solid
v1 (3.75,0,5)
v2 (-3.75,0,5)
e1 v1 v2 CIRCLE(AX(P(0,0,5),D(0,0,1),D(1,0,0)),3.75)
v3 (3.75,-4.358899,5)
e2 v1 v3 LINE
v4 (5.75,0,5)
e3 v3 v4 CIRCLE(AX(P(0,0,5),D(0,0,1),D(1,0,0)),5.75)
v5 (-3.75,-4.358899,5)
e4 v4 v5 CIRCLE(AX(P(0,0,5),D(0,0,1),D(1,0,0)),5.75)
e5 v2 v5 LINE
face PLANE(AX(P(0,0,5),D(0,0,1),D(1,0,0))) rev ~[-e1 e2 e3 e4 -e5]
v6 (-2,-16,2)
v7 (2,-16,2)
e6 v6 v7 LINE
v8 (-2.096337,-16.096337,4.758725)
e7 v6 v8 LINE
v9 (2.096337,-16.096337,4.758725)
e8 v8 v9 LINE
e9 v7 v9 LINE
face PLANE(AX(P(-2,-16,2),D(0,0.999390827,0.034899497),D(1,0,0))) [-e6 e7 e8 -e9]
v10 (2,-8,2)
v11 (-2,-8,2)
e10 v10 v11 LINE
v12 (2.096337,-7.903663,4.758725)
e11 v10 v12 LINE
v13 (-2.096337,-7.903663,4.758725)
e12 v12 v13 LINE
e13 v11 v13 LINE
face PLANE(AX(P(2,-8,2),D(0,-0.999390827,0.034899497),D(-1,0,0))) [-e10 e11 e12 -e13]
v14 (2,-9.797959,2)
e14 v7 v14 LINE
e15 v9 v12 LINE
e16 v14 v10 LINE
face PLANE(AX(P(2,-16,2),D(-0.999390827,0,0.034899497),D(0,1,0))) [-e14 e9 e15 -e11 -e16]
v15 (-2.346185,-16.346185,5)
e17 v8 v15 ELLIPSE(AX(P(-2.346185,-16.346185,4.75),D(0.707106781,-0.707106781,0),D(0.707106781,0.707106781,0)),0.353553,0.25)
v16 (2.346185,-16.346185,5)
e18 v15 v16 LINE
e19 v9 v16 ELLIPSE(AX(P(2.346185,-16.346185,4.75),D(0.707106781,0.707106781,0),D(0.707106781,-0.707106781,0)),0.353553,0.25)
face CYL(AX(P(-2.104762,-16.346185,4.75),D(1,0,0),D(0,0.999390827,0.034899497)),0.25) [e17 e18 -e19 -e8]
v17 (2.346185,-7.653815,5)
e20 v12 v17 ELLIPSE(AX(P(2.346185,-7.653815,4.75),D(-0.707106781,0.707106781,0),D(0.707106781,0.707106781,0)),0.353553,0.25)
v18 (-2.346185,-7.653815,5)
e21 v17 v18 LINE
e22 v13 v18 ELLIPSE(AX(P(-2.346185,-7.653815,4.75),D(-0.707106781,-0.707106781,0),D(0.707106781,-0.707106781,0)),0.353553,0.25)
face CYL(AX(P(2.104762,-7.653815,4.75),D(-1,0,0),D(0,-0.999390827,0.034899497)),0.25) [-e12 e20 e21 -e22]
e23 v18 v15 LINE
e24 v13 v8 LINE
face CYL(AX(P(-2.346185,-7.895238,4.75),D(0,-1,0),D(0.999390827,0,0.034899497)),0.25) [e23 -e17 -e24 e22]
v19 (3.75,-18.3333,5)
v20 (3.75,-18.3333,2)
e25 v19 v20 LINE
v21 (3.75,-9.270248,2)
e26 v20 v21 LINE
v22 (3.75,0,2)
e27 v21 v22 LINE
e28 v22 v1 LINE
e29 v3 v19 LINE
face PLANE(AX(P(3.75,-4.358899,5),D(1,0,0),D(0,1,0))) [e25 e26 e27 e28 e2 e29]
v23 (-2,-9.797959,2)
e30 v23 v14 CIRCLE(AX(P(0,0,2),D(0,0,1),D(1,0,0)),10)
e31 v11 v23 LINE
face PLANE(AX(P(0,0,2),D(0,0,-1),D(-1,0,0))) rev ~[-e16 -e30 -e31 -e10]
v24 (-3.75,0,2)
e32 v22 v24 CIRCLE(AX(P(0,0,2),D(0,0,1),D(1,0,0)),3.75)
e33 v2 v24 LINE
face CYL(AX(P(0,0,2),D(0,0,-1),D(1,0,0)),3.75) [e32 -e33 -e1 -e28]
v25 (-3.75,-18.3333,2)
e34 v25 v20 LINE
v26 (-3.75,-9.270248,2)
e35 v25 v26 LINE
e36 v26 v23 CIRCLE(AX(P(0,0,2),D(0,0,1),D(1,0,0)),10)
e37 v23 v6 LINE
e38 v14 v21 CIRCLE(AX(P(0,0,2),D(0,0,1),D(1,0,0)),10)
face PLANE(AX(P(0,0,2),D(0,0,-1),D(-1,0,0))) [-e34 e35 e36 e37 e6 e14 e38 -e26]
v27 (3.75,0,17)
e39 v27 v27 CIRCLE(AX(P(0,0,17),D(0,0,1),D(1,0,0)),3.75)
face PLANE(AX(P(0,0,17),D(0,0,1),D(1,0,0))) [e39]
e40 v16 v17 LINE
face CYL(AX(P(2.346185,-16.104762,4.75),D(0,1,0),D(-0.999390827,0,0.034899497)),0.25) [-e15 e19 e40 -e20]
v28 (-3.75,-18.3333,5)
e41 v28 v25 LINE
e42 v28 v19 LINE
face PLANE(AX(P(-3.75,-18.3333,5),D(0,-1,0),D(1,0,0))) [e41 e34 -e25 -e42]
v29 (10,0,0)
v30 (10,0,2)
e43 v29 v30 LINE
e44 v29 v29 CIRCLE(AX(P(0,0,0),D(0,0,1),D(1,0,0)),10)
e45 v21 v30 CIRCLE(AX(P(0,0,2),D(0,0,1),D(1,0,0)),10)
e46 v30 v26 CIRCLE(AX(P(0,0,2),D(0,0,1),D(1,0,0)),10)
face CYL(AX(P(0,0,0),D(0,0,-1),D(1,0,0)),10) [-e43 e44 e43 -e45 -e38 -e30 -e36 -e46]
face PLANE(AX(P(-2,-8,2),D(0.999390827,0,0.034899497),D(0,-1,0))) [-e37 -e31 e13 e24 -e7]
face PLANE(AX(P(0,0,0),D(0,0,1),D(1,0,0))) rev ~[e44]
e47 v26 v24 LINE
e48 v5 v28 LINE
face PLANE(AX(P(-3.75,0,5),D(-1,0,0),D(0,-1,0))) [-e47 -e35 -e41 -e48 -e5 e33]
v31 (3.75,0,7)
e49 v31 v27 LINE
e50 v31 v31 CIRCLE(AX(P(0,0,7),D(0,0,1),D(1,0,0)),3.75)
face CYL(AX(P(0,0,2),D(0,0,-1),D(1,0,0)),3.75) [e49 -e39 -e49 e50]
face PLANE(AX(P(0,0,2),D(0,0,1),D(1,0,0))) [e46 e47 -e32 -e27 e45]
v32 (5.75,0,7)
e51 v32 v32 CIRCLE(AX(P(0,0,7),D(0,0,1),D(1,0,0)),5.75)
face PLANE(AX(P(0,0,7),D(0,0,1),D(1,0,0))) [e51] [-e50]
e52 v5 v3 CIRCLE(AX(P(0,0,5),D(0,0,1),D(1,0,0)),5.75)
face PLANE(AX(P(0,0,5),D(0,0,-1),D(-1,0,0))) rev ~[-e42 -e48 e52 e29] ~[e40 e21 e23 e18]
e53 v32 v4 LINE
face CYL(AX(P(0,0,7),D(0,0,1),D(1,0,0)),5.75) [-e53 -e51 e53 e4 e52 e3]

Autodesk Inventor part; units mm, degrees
ref_plane "YZ Plane" through (0, 0, 0) normal (1, 0, 0) x (0, 1, 0)
ref_plane "XZ Plane" through (0, 0, 0) normal (0, 1, 0) x (-1, 0, 0)
sketch "Sketch1" plane through (0, 0, 0) normal (0, 0, 1) x (1, 0, 0)
  circle A0 centre (0, 0) radius 10
  dimension "d0" = 20
extrude "Extrusion1" add sketch "Sketch1" along normal blind 2
sketch "Sketch2" plane through (0, 0, 2) normal (0, 0, 1) x (1, 0, 0)
  circle A0 centre (0, 0) radius 3.75
  dimension "d3" = 7.5
extrude "Extrusion2" add sketch "Sketch2" along normal blind 15
ref_plane "Work Plane2" through (0, 0, 7) normal (0, 0, 1) x (1, 0, 0)
sketch "Sketch7" plane through (0, 0, 7) normal (0, 0, 1) x (1, 0, 0)
  circle A0 centre (0, 0) radius 3.75 projected
  circle A1 centre (0, 0) radius 5.75
  dimension "d27" = 2
extrude "Extrusion7" add sketch "Sketch7" against normal blind 2
sketch "Sketch8" plane through (0, 0, 5) normal (0, 0, -1) x (-1, 0, 0)
  circle A0 centre (0, 0) radius 5.75 projected
  circle A1 centre (0, 0) radius 3.75 projected
  circle A2 centre (0, 0) radius 5.75 construction
  line L0 (5.75, 0) -> (-5.75, 0) construction
  line L1 (-3.75, 0) -> (3.75, 0)
  line L2 (3.75, 0) -> (3.75, -18.3333)
  line L3 (3.75, -18.3333) -> (-3.75, -18.3333)
  line L4 (-3.75, -18.3333) -> (-3.75, 0)
  dimension "d31" = 18.3333
extrude "Extrusion8" add sketch "Sketch8" along normal blind 3 contours L4 A1 L2 A0 | A0 L2 L3 L4 picked at (2.8343, -4.1874)
sketch "Sketch9" plane through (0, 0, 2) normal (0, 0, -1) x (-1, 0, 0)
  arc A0 (-3.75, -4.3589) -> (3.75, -4.3589) centre (0, 0) ccw projected
  line L0 (3.75, -18.3333) -> (3.75, -4.3589) projected
  line L1 (-3.75, -18.3333) -> (3.75, -18.3333) projected
  line L2 (-3.75, -4.3589) -> (-3.75, -18.3333) projected
  line L3 (-2, -8) -> (2, -8)
  line L4 (2, -8) -> (2, -16)
  line L5 (2, -16) -> (-2, -16)
  line L6 (-2, -16) -> (-2, -8)
  dimension "d34" = 2
  dimension "d35" = 4
  dimension "d36" = 8
  dimension "d37" = 8
extrude "Extrusion9" cut sketch "Sketch9" against normal up to surface (3 mm away) draft 2 contours L3 L4 L5 L6
fillet "Fillet2" radius 0.25 4 edges at (0, -16.1048, 5) (2.1048, -12, 5) (-2.1048, -12, 5) (0, -7.8952, 5)
equation "\"d1\" = IG_gearThickness"
equation "\"d3\" = IG_shaftDiameter"
equation "\"d4\" = IG_shaftLength"
equation "\"Wheel_Related_W_\" = 0"
equation "\"W_innerDepth\" = 4"
equation "\"W_wallThickness\" = 2"
equation "\"W_holesClearance\" = 0.3"
equation "\"W_outerGearHoleDiameter\" = 5.3"
equation "\"W_innerGearHoleDiameter\" = 10.1"
equation "\"TempSpotReserved7\" = 0"
equation "\"TempSpotReserved8\" = 0"
equation "\"TempSpotReserved9\" = 0"
equation "\"TempSpotReserved10\" = 0"
equation "\"TempSpotReserved11\" = 0"
equation "\"TempSpotReserved12\" = 0"
equation "\"TempSpotReserved13\" = 0"
equation "\"TempSpotReserved14\" = 0"
equation "\"TempSpotReserved15\" = 0"
equation "\"TempSpotReserved16\" = 0"
equation "\"TempSpotReserved17\" = 0"
equation "\"TempSpotReserved18\" = 0"
equation "\"TempSpotReserved19\" = 0"
equation "\"TempSpotReserved20\" = 0"
equation "\"Inner_Gear_Related_IG_\" = 0"
equation "\"IG_shaftDiameter\" = 7.5"
equation "\"IG_shaftLength\" = 15"
equation "\"IG_gearThickness\" = 2"
equation "\"TempSpotReserved25\" = 0"
equation "\"TempSpotReserved26\" = 0"
equation "\"TempSpotReserved27\" = 0"
equation "\"TempSpotReserved28\" = 0"
equation "\"TempSpotReserved29\" = 0"
equation "\"TempSpotReserved30\" = 0"
equation "\"TempSpotReserved31\" = 0"
equation "\"TempSpotReserved32\" = 0"
equation "\"TempSpotReserved33\" = 0"
equation "\"TempSpotReserved34\" = 0"
equation "\"TempSpotReserved35\" = 0"
equation "\"TempSpotReserved36\" = 0"
equation "\"TempSpotReserved37\" = 0"
equation "\"TempSpotReserved38\" = 0"
equation "\"TempSpotReserved39\" = 0"
equation "\"TempSpotReserved40\" = 0"
equation "\"Outer_Gear_Related_OG_\" = 0"
equation "\"OG_distanceFromCenter\" = 23.33333"
equation "\"OG_shaftDiameter\" = 5"
equation "\"OG_gearDiameter\" = 26.66667"
equation "\"OG_shaftLength\" = 7"
equation "\"OG_gearThickness\" = 2"
equation "\"TempSpotReserved47\" = 0"
equation "\"TempSpotReserved48\" = 0"
equation "\"TempSpotReserved49\" = 0"
equation "\"TempSpotReserved50\" = 0"
equation "\"TempSpotReserved51\" = 0"
equation "\"TempSpotReserved52\" = 0"
equation "\"TempSpotReserved53\" = 0"
equation "\"TempSpotReserved54\" = 0"
equation "\"TempSpotReserved55\" = 0"
equation "\"TempSpotReserved56\" = 0"
equation "\"TempSpotReserved57\" = 0"
equation "\"TempSpotReserved58\" = 0"
equation "\"TempSpotReserved59\" = 0"
equation "\"TempSpotReserved60\" = 0"
equation "\"Leg_Extensions_Related_LE_\" = 0"
equation "\"LE_baseDiameter\" = 5"
equation "\"LE_maxLength\" = 24.6522"
equation "\"LE_thickness\" = 2.5"
equation "\"IG_ratioToOuterGear\" = 0.75"
equation "\"B_bearingThickness\" = 1"
equation "\"TempSpotReserved43\" = 0"
equation "\"TempSpotReserved45\" = 0"
equation "\"Thisisatest\" = 25.4"
equation "\"TempSpotReserved46\" = 0"
equation "\"TempSpotReserved44\" = 0"
equation "\"LE_offsetAboveOuterGear\" = 0"
equation "\"Bearing_Related_B_\" = 0"
equation "\"TempSpotReserved42\" = 0"
equation "\"OG_skirtOffset\" = 1"
equation "\"OG_skirtThickness\" = 1"
equation "\"IG_skirtThickness\" = 2"
equation "\"IG_extentionLength\" = 18.33333"
equation "\"IG_extentionThickness\" = 3"
equation "\"IG_slitWidth\" = 4"
equation "\"IG_slitlength\" = 8"
equation "\"IG_slitDistanceFromCenterHole\" = 8"
equation "\"IG_slitClearance\" = 0.2"
equation "\"Reserved_10\" = 0"
equation "\"Reserved_9\" = 0"
equation "\"Reserved_11\" = 0"
equation "\"Reserved_12\" = 0"
equation "\"Reserved_8\" = 0"
equation "\"Reserved_7\" = 0"
equation "\"Reserved_26\" = 0"
equation "\"Reserved_20\" = 0"
equation "\"Reserved_22\" = 0"
equation "\"Reserved_23\" = 0"
equation "\"Reserved_25\" = 0"
equation "\"Reserved_24\" = 0"
equation "\"Reserved_21\" = 0"
equation "\"Reserved_19\" = 0"
equation "\"Reserved_27\" = 0"
equation "\"Reserved_14\" = 0"
equation "\"Reserved_15\" = 0"
equation "\"Reserved_16\" = 0"
equation "\"Reserved_13\" = 0"
equation "\"Reserved_17\" = 0"
equation "\"Reserved_18\" = 0"
equation "\"Bearing_Related_BR_\" = 0"
equation "\"BR_bearingThickness\" = 1"
equation "\"Block_Related_BL_\" = 0"
equation "\"BL_width\" = 3.8"
equation "\"BL_length\" = 7.8"
equation "\"W_filletRadius\" = 0.25"
equation "\"W_extrutsionTaperAngle\" = 2deg"
equation "\"OG_protrudeDistance\" = 3"
properties part number "innerGear"
